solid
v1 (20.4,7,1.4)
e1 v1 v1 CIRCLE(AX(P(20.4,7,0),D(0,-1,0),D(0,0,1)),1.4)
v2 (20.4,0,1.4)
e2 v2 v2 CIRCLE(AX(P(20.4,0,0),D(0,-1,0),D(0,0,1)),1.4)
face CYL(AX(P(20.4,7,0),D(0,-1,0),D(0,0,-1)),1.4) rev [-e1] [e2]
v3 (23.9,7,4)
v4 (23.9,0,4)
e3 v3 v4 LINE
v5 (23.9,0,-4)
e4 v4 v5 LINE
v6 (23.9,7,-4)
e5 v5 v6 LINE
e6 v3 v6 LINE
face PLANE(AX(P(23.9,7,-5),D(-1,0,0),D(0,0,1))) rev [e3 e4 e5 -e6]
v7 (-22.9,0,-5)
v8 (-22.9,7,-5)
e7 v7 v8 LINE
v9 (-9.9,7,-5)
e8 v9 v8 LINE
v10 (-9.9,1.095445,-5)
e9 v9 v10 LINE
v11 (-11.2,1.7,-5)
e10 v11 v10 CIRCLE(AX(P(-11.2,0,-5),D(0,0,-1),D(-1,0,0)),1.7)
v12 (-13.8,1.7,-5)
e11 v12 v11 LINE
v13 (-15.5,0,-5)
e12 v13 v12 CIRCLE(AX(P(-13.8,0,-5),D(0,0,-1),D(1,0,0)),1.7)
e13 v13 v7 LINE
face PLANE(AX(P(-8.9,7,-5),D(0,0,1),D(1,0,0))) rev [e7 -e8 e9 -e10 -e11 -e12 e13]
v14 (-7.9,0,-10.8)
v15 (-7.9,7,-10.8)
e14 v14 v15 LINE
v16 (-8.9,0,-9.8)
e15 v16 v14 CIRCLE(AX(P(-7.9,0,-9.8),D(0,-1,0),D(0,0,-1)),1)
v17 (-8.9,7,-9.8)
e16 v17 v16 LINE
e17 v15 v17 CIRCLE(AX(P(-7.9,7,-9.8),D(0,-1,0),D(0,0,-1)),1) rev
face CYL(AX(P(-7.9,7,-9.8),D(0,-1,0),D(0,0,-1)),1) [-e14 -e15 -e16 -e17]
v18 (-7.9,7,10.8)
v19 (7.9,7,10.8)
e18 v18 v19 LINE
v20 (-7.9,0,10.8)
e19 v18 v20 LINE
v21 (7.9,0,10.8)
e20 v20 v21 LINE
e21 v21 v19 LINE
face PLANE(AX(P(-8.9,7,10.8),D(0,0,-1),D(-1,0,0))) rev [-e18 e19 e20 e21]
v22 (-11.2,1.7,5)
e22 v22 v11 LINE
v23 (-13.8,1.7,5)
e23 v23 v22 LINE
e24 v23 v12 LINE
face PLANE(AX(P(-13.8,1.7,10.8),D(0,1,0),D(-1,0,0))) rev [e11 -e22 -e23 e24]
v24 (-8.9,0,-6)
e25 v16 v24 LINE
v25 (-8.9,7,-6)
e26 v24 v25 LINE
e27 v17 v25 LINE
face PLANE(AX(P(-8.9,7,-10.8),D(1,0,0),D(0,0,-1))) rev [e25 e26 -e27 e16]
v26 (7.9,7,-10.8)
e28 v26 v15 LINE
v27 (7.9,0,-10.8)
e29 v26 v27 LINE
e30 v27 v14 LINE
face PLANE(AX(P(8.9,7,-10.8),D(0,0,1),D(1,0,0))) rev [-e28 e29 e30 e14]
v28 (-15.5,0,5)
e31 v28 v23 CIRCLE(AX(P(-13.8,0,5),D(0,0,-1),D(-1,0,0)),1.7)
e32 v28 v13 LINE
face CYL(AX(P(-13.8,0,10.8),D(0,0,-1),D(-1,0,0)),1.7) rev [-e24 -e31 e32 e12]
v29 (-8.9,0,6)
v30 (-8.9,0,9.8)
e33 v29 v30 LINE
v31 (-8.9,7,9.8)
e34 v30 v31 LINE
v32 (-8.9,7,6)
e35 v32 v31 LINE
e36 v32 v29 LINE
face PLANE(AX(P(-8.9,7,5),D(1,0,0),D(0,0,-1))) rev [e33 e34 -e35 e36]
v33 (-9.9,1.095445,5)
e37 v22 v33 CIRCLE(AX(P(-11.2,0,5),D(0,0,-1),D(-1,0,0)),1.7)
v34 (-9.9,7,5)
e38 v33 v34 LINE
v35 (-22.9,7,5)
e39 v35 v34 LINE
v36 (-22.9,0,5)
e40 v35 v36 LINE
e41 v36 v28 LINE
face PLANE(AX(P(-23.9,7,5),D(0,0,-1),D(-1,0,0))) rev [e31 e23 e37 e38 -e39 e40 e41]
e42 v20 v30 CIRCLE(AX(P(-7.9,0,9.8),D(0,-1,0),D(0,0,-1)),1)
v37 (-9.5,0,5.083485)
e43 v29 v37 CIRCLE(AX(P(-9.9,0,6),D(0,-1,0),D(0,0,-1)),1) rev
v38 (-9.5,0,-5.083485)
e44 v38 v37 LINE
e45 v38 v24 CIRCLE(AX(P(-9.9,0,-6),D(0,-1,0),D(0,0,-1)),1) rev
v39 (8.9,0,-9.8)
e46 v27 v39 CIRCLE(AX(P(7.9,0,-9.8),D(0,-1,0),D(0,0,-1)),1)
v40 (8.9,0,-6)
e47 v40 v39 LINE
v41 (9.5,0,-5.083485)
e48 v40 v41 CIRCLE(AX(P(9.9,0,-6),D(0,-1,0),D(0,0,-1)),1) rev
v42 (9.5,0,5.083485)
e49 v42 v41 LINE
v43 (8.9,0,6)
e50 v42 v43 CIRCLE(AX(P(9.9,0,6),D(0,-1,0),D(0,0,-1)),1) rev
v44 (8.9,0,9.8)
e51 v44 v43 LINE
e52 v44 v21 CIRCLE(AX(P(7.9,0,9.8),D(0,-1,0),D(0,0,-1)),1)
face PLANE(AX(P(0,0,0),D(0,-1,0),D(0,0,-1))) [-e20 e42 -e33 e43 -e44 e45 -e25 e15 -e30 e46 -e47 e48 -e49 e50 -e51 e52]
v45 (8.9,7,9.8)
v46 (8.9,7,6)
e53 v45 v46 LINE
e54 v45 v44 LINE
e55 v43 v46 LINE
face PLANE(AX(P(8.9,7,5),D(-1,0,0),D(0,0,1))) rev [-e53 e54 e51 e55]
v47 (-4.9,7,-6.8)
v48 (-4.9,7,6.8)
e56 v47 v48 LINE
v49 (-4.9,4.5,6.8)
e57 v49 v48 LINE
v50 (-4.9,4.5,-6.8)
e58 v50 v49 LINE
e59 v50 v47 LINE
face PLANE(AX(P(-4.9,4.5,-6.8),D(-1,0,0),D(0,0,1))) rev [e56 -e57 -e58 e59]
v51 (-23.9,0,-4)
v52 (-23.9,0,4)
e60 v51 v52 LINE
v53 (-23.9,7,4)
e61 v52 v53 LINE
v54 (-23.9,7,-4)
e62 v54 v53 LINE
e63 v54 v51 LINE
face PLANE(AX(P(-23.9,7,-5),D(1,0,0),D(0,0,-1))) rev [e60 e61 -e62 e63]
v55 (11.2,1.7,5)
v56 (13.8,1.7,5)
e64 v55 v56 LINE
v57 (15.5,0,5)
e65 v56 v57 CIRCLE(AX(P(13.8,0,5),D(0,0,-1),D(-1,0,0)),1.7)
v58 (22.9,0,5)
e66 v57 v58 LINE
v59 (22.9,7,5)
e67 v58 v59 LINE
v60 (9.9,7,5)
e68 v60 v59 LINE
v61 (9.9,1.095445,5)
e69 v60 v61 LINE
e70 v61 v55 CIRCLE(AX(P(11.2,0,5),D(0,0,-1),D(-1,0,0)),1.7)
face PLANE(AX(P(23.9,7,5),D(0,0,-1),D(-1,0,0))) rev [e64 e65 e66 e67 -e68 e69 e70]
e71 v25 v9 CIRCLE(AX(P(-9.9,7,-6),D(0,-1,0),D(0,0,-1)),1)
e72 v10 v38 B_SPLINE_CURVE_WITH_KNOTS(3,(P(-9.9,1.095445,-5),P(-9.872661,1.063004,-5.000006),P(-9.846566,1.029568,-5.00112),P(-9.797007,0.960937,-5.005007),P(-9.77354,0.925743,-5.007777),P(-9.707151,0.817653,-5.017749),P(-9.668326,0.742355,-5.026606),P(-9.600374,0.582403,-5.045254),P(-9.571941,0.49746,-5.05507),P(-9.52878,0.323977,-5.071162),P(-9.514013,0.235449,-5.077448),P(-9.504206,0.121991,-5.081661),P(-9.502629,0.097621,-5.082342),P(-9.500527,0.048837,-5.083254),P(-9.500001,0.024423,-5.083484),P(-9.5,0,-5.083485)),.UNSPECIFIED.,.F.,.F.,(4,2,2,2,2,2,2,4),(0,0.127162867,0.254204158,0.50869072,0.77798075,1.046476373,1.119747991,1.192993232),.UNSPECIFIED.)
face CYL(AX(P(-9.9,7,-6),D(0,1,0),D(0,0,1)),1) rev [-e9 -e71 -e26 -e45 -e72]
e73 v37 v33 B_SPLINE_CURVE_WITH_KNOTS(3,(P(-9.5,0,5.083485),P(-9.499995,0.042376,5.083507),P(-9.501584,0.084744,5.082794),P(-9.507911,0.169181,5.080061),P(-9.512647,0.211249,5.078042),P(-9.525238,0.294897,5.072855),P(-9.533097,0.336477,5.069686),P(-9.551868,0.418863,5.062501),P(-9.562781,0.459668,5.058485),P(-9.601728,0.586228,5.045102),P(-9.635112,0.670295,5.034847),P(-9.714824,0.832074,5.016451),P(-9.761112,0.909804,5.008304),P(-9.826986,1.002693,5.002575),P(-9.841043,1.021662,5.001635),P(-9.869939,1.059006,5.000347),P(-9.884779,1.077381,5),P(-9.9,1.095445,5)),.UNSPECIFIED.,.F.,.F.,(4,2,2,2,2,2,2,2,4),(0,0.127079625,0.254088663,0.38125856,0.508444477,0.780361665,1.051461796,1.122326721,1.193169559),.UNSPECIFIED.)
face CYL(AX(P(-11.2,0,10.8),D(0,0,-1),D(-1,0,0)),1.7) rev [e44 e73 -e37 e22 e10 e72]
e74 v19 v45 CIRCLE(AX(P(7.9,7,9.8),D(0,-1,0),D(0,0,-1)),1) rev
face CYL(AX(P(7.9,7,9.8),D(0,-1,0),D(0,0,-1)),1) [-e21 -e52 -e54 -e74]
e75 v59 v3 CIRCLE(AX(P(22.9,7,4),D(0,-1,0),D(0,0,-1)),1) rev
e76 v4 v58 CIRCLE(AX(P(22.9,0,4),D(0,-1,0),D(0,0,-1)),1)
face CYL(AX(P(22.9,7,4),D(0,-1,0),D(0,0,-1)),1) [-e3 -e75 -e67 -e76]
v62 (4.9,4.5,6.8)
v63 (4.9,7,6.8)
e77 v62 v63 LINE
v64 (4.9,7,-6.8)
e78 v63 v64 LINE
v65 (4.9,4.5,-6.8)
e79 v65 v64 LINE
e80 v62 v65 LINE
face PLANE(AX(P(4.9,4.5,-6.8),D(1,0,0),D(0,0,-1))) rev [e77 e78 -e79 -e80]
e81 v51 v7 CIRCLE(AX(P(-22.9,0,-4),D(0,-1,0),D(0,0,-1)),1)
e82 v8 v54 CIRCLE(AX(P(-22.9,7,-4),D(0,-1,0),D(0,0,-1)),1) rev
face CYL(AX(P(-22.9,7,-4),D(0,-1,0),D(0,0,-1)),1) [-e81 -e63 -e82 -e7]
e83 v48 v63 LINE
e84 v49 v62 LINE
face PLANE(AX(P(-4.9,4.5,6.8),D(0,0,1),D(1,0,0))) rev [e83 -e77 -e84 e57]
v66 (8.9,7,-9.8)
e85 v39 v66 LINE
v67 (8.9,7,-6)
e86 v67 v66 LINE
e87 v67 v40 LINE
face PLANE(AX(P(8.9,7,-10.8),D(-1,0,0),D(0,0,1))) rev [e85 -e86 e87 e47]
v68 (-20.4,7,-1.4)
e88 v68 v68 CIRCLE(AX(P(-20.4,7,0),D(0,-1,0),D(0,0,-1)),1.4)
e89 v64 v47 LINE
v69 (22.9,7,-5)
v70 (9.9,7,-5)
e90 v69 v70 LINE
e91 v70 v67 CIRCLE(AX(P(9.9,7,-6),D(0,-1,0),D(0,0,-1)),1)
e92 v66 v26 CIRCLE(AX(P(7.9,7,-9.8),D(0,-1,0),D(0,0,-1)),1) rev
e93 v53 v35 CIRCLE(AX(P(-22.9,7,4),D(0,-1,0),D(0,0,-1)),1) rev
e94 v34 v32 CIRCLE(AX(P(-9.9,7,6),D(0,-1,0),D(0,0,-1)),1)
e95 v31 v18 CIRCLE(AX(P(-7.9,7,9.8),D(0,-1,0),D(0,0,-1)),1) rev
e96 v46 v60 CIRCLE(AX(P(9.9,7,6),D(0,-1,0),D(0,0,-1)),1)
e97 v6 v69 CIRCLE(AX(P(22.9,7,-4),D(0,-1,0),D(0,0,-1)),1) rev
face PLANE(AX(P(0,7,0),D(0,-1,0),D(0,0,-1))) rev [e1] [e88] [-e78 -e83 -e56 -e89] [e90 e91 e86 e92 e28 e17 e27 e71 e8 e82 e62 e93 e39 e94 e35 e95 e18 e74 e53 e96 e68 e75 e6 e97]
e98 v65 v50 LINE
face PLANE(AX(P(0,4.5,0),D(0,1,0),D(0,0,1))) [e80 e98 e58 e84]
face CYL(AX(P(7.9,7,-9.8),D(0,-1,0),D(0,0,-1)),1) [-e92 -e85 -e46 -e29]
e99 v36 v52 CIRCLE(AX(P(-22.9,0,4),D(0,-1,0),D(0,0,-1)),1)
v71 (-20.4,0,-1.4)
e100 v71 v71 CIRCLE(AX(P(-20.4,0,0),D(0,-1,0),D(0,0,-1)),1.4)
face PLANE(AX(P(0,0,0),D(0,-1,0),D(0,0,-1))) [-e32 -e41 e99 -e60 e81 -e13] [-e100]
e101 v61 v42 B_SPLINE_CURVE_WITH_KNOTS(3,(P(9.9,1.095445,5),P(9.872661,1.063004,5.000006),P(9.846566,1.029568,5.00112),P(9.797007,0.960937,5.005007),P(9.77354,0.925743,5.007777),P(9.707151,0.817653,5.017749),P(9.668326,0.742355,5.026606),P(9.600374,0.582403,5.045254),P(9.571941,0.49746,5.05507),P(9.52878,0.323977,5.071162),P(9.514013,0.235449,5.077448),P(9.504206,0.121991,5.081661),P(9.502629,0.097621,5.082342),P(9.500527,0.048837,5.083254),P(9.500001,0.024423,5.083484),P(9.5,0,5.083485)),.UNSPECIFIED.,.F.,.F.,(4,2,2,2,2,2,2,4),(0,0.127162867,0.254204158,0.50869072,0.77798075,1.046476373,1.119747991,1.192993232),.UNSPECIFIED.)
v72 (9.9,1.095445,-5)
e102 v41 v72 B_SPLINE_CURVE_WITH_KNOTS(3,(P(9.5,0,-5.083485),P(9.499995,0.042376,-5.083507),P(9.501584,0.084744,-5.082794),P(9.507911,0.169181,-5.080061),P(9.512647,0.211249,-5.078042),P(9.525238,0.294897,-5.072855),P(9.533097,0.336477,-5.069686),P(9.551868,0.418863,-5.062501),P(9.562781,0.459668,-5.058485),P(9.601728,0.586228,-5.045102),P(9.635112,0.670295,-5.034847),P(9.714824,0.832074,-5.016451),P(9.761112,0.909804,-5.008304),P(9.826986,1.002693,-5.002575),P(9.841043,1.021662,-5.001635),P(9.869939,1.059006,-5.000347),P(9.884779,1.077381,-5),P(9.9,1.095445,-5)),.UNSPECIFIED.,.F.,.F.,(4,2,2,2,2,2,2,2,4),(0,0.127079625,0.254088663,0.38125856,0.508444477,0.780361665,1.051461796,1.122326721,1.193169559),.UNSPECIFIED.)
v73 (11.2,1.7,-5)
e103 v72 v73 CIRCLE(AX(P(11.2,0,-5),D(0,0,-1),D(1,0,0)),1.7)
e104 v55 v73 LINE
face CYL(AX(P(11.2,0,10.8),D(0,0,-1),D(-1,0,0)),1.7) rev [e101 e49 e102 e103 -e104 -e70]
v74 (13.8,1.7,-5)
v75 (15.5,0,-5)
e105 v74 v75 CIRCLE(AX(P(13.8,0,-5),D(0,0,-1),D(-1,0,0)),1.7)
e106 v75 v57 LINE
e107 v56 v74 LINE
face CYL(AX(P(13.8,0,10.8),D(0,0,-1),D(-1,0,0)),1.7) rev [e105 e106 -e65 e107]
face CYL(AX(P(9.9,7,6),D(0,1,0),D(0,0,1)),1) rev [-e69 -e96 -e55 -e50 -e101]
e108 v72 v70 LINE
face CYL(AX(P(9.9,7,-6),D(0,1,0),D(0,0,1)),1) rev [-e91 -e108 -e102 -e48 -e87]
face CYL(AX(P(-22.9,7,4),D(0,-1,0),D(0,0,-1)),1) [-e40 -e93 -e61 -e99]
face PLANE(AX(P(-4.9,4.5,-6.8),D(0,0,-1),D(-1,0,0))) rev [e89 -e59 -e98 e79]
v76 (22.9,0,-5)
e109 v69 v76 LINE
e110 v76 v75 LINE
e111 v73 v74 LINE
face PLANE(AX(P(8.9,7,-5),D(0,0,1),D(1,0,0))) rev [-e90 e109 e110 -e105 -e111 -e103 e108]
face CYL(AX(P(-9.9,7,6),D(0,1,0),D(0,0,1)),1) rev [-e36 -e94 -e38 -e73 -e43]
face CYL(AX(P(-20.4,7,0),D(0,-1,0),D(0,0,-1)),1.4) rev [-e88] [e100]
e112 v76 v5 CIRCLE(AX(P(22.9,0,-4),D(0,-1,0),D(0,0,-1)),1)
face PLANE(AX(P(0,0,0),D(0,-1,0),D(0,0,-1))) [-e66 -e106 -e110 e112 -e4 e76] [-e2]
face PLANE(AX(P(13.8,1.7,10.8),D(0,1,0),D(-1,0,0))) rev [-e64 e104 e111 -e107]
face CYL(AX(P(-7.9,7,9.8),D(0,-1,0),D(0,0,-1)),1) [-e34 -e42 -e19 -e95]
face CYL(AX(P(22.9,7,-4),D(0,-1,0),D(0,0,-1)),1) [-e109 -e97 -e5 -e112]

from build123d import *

# Parameters (mm, degrees)
BASE_DEPTH                = 7
SKETCH2_W                 = 9.8
SKETCH2_H                 = 13.6
PCB_CUTOUT_DEPTH          = 2.5
BASKET_WIRE_GROOVES_DEPTH = 30.49321956
SKETCH5_R                 = 1.4
SCREW_HOLES_DEPTH         = 28.14498112
F_1MM_EDGE_FILLETS_R      = 1


with BuildPart() as part:
    # Sketch1 → Base (new body)
    with BuildSketch(Plane(origin=(0, 0, 0), x_dir=(1, 0, 0), z_dir=(0, 1, 0))):
        Polygon((-8.9, 10.8), (-8.9, 5), (-23.9, 5), (-23.9, -5), (-8.9, -5), (-8.9, -10.8), (8.9, -10.8), (8.9, -5), (23.9, -5), (23.9, 5), (8.9, 5), (8.9, 10.8), (0, 10.8), align=None)
    extrude(amount=BASE_DEPTH)

    # Sketch2 → PCB Cutout (cut)
    with BuildSketch(Plane(origin=(0, 7, 0), x_dir=(1, 0, 0), z_dir=(0, 1, 0))):
        Rectangle(SKETCH2_W, SKETCH2_H)
    extrude(amount=-PCB_CUTOUT_DEPTH, mode=Mode.SUBTRACT)

    # Sketch4 → Basket Wire Grooves (cut, through all)
    with BuildSketch(Plane(origin=(0, 0, -5), x_dir=(-1, 0, 0), z_dir=(0, 0, -1))):
        with BuildLine():
            Line((-9.5, 0), (-15.5, 0))
            ThreePointArc((-15.5, 0), (-15.002081528, 1.202081528), (-13.8, 1.7))
            Line((-13.8, 1.7), (-11.2, 1.7))
            ThreePointArc((-11.2, 1.7), (-9.997918472, 1.202081528), (-9.5, 0))
        make_face()
        with BuildLine():
            Line((13.8, 1.7), (11.2, 1.7))
            ThreePointArc((11.2, 1.7), (9.997918472, 1.202081528), (9.5, 0))
            Line((9.5, 0), (15.5, 0))
            ThreePointArc((15.5, 0), (15.002081528, 1.202081528), (13.8, 1.7))
        make_face()
    extrude(amount=-BASKET_WIRE_GROOVES_DEPTH, mode=Mode.SUBTRACT)

    # Sketch5 → Screw Holes (cut, through all)
    with BuildSketch(Plane.XZ):
        with Locations(Location((-20.4, 0, 0), (0, 0, 270))):
            Circle(SKETCH5_R)
        with Locations(Location((20.4, 0, 0), (0, 0, 90))):
            Circle(SKETCH5_R)
    extrude(amount=-SCREW_HOLES_DEPTH, mode=Mode.SUBTRACT)

    # 1mm Edge Fillets
    # the kernel refuses this fillet: 1 mm, written as the material it adds along each edge
    with BuildSketch(Plane(origin=(8.9, 0, -5), x_dir=(0, 0, -1), z_dir=(0, 1, 0))) as f_1mm_edge_fillets_piece_1_section:
        with BuildLine():
            CenterArc((F_1MM_EDGE_FILLETS_R, -F_1MM_EDGE_FILLETS_R), F_1MM_EDGE_FILLETS_R, 90, 90)
            Line((0, -F_1MM_EDGE_FILLETS_R), (0, 0))
            Line((0, 0), (F_1MM_EDGE_FILLETS_R, 0))
        make_face()
    f_1mm_edge_fillets_piece_1 = extrude(amount=7, mode=Mode.PRIVATE)
    f_1mm_edge_fillets_piece_1 = f_1mm_edge_fillets_piece_1 - Plane(origin=(11.2, 0, -5.227855897), x_dir=(0, 1, 0), z_dir=(0, 0, -1)) * Cylinder(1.7, 18, mode=Mode.PRIVATE)
    add(f_1mm_edge_fillets_piece_1)
    with BuildSketch(Plane(origin=(8.9, 0, 5), x_dir=(1, 0, 0), z_dir=(0, 1, 0))) as f_1mm_edge_fillets_piece_2_section:
        with BuildLine():
            CenterArc((F_1MM_EDGE_FILLETS_R, -F_1MM_EDGE_FILLETS_R), F_1MM_EDGE_FILLETS_R, 90, 90)
            Line((0, -F_1MM_EDGE_FILLETS_R), (0, 0))
            Line((0, 0), (F_1MM_EDGE_FILLETS_R, 0))
        make_face()
    f_1mm_edge_fillets_piece_2 = extrude(amount=7, mode=Mode.PRIVATE)
    f_1mm_edge_fillets_piece_2 = f_1mm_edge_fillets_piece_2 - Plane(origin=(11.2, 0, 5.227855907), x_dir=(0, 1, 0), z_dir=(0, 0, -1)) * Cylinder(1.7, 19, mode=Mode.PRIVATE)
    add(f_1mm_edge_fillets_piece_2)
    with BuildSketch(Plane(origin=(-8.9, 0, 5), x_dir=(0, 0, 1), z_dir=(0, 1, 0))) as f_1mm_edge_fillets_piece_3_section:
        with BuildLine():
            CenterArc((F_1MM_EDGE_FILLETS_R, -F_1MM_EDGE_FILLETS_R), F_1MM_EDGE_FILLETS_R, 90, 90)
            Line((0, -F_1MM_EDGE_FILLETS_R), (0, 0))
            Line((0, 0), (F_1MM_EDGE_FILLETS_R, 0))
        make_face()
    f_1mm_edge_fillets_piece_3 = extrude(amount=7, mode=Mode.PRIVATE)
    f_1mm_edge_fillets_piece_3 = f_1mm_edge_fillets_piece_3 - Plane(origin=(-11.2, 0, 5.227855897), x_dir=(0, 1, 0), z_dir=(0, 0, -1)) * Cylinder(1.7, 18, mode=Mode.PRIVATE)
    add(f_1mm_edge_fillets_piece_3)
    with BuildSketch(Plane(origin=(-8.9, 0, -5), x_dir=(0, 0, -1), z_dir=(0, 1, 0))) as f_1mm_edge_fillets_piece_4_section:
        with BuildLine():
            CenterArc((F_1MM_EDGE_FILLETS_R, F_1MM_EDGE_FILLETS_R), F_1MM_EDGE_FILLETS_R, 180, 90)
            Line((0, F_1MM_EDGE_FILLETS_R), (0, 0))
            Line((0, 0), (F_1MM_EDGE_FILLETS_R, 0))
        make_face()
    f_1mm_edge_fillets_piece_4 = extrude(amount=7, mode=Mode.PRIVATE)
    f_1mm_edge_fillets_piece_4 = f_1mm_edge_fillets_piece_4 - Plane(origin=(-11.2, 0, -5.227855897), x_dir=(0, 1, 0), z_dir=(0, 0, -1)) * Cylinder(1.7, 19, mode=Mode.PRIVATE)
    add(f_1mm_edge_fillets_piece_4)
    # the kernel refuses this fillet: 1 mm, written as the material it takes off along each edge
    with BuildSketch(Plane(origin=(8.9, -2.5, -10.8), x_dir=(-1, 0, 0), z_dir=(0, 1, 0)), Plane(origin=(23.9, -2.5, -5), x_dir=(-1, 0, 0), z_dir=(0, 1, 0)), Plane(origin=(23.9, -2.5, 5), x_dir=(0, 0, -1), z_dir=(0, 1, 0)), Plane(origin=(8.9, -2.5, 10.8), x_dir=(0, 0, -1), z_dir=(0, 1, 0)), Plane(origin=(-8.9, -2.5, 10.8), x_dir=(1, 0, 0), z_dir=(0, 1, 0)), Plane(origin=(-23.9, -2.5, 5), x_dir=(1, 0, 0), z_dir=(0, 1, 0)), Plane(origin=(-23.9, -2.5, -5), x_dir=(0, 0, 1), z_dir=(0, 1, 0)), Plane(origin=(-8.9, -2.5, -10.8), x_dir=(0, 0, 1), z_dir=(0, 1, 0))) as f_1mm_edge_fillets_2_piece_1:
        with BuildLine():
            CenterArc((F_1MM_EDGE_FILLETS_R, F_1MM_EDGE_FILLETS_R), F_1MM_EDGE_FILLETS_R, 180, 90)
            Line((0, F_1MM_EDGE_FILLETS_R), (0, 0))
            Line((0, 0), (F_1MM_EDGE_FILLETS_R, 0))
        make_face()
    extrude(amount=12, mode=Mode.SUBTRACT)


solid = part.part
